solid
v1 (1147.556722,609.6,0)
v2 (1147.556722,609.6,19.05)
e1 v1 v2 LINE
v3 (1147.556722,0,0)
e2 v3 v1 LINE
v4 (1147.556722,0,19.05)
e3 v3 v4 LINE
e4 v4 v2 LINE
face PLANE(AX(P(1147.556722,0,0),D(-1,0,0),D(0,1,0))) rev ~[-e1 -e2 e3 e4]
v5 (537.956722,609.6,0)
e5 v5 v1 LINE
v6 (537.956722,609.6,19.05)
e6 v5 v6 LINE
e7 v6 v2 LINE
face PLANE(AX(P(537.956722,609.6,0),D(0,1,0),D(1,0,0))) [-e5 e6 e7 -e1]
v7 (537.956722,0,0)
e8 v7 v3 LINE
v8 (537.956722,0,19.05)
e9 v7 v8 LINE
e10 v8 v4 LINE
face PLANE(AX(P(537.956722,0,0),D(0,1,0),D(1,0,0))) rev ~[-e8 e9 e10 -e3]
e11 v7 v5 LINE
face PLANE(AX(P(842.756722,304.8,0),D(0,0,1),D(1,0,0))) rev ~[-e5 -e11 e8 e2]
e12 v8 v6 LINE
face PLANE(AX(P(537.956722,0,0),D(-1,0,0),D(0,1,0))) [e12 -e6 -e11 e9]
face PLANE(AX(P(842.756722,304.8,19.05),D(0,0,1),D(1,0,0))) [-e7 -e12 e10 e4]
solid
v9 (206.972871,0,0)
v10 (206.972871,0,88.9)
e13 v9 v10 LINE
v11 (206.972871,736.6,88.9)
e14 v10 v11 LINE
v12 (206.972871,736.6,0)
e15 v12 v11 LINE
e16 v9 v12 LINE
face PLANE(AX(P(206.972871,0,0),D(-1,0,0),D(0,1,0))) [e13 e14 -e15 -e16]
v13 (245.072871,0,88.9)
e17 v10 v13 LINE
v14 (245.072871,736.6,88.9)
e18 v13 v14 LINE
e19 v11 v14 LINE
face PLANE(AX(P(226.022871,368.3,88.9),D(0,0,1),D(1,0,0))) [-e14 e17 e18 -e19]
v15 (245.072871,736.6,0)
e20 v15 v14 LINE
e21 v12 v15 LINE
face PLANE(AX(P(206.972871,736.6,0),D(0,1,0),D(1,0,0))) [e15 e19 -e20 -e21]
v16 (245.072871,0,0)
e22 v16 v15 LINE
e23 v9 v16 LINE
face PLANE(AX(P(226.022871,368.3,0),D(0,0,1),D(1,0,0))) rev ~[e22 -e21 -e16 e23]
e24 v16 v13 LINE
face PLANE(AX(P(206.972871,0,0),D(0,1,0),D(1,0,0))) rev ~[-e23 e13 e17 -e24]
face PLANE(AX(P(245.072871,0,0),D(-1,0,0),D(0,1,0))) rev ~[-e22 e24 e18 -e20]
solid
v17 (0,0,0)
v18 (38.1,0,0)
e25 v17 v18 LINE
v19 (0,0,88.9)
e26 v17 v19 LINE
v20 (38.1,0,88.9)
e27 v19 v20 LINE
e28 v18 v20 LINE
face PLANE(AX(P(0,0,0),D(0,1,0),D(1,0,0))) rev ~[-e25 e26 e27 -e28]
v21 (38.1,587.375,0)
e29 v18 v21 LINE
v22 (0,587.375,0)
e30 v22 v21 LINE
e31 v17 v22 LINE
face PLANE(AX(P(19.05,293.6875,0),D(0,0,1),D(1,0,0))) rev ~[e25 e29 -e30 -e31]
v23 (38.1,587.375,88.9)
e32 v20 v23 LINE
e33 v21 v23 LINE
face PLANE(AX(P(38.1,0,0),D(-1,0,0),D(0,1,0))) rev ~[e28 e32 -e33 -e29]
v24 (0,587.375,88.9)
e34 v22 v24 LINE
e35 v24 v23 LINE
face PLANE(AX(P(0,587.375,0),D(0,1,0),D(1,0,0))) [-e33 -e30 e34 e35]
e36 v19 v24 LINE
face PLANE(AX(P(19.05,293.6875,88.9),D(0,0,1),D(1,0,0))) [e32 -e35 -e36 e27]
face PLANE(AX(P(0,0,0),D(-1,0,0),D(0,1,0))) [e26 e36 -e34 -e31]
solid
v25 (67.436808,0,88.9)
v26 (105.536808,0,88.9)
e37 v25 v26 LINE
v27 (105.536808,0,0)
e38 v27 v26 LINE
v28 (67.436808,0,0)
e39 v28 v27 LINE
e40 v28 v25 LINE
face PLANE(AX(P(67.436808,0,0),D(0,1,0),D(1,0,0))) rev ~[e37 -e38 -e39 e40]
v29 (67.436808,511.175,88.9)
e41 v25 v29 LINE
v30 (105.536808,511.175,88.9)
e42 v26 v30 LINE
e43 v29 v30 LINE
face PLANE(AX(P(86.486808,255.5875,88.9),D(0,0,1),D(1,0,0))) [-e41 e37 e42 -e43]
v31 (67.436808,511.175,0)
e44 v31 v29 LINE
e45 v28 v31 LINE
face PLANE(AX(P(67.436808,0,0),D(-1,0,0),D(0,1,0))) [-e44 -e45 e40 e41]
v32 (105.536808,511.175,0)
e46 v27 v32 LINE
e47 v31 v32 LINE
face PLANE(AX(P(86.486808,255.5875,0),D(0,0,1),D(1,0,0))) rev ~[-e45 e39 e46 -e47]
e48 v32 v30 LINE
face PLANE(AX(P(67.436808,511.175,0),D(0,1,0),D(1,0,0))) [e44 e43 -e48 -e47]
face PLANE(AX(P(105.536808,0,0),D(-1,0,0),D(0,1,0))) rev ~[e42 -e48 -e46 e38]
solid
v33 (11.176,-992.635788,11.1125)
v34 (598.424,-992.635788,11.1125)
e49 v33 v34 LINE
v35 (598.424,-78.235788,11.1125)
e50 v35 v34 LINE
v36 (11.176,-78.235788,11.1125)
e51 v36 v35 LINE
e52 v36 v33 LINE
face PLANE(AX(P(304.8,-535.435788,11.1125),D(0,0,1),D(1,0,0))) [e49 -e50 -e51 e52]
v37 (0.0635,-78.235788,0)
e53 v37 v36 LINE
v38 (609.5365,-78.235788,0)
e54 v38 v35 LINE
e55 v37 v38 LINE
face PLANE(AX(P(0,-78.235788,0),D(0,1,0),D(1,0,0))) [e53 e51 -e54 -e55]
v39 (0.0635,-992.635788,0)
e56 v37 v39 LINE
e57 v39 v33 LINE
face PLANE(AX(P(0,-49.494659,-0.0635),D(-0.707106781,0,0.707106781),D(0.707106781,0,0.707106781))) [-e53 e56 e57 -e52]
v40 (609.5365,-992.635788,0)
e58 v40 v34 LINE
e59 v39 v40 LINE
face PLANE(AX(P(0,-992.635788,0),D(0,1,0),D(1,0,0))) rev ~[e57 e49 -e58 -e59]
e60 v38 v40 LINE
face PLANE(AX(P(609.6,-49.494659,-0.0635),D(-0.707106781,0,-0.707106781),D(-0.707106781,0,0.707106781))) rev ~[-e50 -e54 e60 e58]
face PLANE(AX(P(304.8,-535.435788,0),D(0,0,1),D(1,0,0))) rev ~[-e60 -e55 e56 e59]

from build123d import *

# Parameters (mm, degrees)
F0_W         = 38.1
F0_H         = 587.375
F1_DEPTH     = 88.9
F2_W         = 38.1
F2_H         = 736.6
F3_DEPTH     = 88.9
F4_W         = 38.1
F4_H         = 511.175
F5_DEPTH     = 88.9
F6_W         = 609.6
F6_H         = 609.6
F7_DEPTH     = 19.05
F8_W         = 609.6
F8_H         = 914.4
F9_DEPTH     = 11.1125
F10_T1_DEPTH = 971.882258147


# Not quite as in the source:
# - a fillet or chamfer that OpenCascade refuses, or shapes differently, is made with other operations: its cross-section is extruded or revolved along the edge and cut away or added
# - a length typed as a fraction of an inch, garbled in the dataset ("3 / 203.2 mm" for 3/8 in), is restored


with BuildPart() as f1:
    # F0 (on Top) → F1 (new body)
    with BuildSketch(Plane.XY):
        with Locations((19.05, 293.6875)):
            Rectangle(F0_W, F0_H)
    extrude(amount=F1_DEPTH)


with BuildPart() as f3:
    # F2 (on Top) → F3 (new body)
    with BuildSketch(Plane.XY):
        with Locations((226.0228706253, 368.3)):
            Rectangle(F2_W, F2_H)
    extrude(amount=F3_DEPTH)


with BuildPart() as f5:
    # F4 (on Top) → F5 (new body)
    with BuildSketch(Plane.XY):
        with Locations((86.4868082545, 255.5875)):
            Rectangle(F4_W, F4_H)
    extrude(amount=F5_DEPTH)


with BuildPart() as f7:
    # F6 (on Top) → F7 (new body)
    with BuildSketch(Plane.XY):
        with Locations((842.7567224306, 304.8)):
            Rectangle(F6_W, F6_H)
    extrude(amount=F7_DEPTH)


with BuildPart() as f9:
    # F8 (on Top) → F9 (new body)
    with BuildSketch(Plane.XY):
        with Locations((304.8, -535.4357879985)):
            Rectangle(F8_W, F8_H)
    extrude(amount=F9_DEPTH)

    # F10: chamfer of 11.176 on 2 edges, made by hand

    # F10_s2 → F10_t1 (cut)
    with BuildSketch(Plane.XZ.offset(49.494658925)):
        Polygon((609.6, -0.0635), (598.424, 11.1125), (609.6, 11.1125), align=None)
        Polygon((0, -0.0635), (11.176, 11.1125), (0, 11.1125), align=None)
    extrude(amount=F10_T1_DEPTH, mode=Mode.SUBTRACT)


solid = Compound([f1.part, f3.part, f5.part, f7.part, f9.part])
